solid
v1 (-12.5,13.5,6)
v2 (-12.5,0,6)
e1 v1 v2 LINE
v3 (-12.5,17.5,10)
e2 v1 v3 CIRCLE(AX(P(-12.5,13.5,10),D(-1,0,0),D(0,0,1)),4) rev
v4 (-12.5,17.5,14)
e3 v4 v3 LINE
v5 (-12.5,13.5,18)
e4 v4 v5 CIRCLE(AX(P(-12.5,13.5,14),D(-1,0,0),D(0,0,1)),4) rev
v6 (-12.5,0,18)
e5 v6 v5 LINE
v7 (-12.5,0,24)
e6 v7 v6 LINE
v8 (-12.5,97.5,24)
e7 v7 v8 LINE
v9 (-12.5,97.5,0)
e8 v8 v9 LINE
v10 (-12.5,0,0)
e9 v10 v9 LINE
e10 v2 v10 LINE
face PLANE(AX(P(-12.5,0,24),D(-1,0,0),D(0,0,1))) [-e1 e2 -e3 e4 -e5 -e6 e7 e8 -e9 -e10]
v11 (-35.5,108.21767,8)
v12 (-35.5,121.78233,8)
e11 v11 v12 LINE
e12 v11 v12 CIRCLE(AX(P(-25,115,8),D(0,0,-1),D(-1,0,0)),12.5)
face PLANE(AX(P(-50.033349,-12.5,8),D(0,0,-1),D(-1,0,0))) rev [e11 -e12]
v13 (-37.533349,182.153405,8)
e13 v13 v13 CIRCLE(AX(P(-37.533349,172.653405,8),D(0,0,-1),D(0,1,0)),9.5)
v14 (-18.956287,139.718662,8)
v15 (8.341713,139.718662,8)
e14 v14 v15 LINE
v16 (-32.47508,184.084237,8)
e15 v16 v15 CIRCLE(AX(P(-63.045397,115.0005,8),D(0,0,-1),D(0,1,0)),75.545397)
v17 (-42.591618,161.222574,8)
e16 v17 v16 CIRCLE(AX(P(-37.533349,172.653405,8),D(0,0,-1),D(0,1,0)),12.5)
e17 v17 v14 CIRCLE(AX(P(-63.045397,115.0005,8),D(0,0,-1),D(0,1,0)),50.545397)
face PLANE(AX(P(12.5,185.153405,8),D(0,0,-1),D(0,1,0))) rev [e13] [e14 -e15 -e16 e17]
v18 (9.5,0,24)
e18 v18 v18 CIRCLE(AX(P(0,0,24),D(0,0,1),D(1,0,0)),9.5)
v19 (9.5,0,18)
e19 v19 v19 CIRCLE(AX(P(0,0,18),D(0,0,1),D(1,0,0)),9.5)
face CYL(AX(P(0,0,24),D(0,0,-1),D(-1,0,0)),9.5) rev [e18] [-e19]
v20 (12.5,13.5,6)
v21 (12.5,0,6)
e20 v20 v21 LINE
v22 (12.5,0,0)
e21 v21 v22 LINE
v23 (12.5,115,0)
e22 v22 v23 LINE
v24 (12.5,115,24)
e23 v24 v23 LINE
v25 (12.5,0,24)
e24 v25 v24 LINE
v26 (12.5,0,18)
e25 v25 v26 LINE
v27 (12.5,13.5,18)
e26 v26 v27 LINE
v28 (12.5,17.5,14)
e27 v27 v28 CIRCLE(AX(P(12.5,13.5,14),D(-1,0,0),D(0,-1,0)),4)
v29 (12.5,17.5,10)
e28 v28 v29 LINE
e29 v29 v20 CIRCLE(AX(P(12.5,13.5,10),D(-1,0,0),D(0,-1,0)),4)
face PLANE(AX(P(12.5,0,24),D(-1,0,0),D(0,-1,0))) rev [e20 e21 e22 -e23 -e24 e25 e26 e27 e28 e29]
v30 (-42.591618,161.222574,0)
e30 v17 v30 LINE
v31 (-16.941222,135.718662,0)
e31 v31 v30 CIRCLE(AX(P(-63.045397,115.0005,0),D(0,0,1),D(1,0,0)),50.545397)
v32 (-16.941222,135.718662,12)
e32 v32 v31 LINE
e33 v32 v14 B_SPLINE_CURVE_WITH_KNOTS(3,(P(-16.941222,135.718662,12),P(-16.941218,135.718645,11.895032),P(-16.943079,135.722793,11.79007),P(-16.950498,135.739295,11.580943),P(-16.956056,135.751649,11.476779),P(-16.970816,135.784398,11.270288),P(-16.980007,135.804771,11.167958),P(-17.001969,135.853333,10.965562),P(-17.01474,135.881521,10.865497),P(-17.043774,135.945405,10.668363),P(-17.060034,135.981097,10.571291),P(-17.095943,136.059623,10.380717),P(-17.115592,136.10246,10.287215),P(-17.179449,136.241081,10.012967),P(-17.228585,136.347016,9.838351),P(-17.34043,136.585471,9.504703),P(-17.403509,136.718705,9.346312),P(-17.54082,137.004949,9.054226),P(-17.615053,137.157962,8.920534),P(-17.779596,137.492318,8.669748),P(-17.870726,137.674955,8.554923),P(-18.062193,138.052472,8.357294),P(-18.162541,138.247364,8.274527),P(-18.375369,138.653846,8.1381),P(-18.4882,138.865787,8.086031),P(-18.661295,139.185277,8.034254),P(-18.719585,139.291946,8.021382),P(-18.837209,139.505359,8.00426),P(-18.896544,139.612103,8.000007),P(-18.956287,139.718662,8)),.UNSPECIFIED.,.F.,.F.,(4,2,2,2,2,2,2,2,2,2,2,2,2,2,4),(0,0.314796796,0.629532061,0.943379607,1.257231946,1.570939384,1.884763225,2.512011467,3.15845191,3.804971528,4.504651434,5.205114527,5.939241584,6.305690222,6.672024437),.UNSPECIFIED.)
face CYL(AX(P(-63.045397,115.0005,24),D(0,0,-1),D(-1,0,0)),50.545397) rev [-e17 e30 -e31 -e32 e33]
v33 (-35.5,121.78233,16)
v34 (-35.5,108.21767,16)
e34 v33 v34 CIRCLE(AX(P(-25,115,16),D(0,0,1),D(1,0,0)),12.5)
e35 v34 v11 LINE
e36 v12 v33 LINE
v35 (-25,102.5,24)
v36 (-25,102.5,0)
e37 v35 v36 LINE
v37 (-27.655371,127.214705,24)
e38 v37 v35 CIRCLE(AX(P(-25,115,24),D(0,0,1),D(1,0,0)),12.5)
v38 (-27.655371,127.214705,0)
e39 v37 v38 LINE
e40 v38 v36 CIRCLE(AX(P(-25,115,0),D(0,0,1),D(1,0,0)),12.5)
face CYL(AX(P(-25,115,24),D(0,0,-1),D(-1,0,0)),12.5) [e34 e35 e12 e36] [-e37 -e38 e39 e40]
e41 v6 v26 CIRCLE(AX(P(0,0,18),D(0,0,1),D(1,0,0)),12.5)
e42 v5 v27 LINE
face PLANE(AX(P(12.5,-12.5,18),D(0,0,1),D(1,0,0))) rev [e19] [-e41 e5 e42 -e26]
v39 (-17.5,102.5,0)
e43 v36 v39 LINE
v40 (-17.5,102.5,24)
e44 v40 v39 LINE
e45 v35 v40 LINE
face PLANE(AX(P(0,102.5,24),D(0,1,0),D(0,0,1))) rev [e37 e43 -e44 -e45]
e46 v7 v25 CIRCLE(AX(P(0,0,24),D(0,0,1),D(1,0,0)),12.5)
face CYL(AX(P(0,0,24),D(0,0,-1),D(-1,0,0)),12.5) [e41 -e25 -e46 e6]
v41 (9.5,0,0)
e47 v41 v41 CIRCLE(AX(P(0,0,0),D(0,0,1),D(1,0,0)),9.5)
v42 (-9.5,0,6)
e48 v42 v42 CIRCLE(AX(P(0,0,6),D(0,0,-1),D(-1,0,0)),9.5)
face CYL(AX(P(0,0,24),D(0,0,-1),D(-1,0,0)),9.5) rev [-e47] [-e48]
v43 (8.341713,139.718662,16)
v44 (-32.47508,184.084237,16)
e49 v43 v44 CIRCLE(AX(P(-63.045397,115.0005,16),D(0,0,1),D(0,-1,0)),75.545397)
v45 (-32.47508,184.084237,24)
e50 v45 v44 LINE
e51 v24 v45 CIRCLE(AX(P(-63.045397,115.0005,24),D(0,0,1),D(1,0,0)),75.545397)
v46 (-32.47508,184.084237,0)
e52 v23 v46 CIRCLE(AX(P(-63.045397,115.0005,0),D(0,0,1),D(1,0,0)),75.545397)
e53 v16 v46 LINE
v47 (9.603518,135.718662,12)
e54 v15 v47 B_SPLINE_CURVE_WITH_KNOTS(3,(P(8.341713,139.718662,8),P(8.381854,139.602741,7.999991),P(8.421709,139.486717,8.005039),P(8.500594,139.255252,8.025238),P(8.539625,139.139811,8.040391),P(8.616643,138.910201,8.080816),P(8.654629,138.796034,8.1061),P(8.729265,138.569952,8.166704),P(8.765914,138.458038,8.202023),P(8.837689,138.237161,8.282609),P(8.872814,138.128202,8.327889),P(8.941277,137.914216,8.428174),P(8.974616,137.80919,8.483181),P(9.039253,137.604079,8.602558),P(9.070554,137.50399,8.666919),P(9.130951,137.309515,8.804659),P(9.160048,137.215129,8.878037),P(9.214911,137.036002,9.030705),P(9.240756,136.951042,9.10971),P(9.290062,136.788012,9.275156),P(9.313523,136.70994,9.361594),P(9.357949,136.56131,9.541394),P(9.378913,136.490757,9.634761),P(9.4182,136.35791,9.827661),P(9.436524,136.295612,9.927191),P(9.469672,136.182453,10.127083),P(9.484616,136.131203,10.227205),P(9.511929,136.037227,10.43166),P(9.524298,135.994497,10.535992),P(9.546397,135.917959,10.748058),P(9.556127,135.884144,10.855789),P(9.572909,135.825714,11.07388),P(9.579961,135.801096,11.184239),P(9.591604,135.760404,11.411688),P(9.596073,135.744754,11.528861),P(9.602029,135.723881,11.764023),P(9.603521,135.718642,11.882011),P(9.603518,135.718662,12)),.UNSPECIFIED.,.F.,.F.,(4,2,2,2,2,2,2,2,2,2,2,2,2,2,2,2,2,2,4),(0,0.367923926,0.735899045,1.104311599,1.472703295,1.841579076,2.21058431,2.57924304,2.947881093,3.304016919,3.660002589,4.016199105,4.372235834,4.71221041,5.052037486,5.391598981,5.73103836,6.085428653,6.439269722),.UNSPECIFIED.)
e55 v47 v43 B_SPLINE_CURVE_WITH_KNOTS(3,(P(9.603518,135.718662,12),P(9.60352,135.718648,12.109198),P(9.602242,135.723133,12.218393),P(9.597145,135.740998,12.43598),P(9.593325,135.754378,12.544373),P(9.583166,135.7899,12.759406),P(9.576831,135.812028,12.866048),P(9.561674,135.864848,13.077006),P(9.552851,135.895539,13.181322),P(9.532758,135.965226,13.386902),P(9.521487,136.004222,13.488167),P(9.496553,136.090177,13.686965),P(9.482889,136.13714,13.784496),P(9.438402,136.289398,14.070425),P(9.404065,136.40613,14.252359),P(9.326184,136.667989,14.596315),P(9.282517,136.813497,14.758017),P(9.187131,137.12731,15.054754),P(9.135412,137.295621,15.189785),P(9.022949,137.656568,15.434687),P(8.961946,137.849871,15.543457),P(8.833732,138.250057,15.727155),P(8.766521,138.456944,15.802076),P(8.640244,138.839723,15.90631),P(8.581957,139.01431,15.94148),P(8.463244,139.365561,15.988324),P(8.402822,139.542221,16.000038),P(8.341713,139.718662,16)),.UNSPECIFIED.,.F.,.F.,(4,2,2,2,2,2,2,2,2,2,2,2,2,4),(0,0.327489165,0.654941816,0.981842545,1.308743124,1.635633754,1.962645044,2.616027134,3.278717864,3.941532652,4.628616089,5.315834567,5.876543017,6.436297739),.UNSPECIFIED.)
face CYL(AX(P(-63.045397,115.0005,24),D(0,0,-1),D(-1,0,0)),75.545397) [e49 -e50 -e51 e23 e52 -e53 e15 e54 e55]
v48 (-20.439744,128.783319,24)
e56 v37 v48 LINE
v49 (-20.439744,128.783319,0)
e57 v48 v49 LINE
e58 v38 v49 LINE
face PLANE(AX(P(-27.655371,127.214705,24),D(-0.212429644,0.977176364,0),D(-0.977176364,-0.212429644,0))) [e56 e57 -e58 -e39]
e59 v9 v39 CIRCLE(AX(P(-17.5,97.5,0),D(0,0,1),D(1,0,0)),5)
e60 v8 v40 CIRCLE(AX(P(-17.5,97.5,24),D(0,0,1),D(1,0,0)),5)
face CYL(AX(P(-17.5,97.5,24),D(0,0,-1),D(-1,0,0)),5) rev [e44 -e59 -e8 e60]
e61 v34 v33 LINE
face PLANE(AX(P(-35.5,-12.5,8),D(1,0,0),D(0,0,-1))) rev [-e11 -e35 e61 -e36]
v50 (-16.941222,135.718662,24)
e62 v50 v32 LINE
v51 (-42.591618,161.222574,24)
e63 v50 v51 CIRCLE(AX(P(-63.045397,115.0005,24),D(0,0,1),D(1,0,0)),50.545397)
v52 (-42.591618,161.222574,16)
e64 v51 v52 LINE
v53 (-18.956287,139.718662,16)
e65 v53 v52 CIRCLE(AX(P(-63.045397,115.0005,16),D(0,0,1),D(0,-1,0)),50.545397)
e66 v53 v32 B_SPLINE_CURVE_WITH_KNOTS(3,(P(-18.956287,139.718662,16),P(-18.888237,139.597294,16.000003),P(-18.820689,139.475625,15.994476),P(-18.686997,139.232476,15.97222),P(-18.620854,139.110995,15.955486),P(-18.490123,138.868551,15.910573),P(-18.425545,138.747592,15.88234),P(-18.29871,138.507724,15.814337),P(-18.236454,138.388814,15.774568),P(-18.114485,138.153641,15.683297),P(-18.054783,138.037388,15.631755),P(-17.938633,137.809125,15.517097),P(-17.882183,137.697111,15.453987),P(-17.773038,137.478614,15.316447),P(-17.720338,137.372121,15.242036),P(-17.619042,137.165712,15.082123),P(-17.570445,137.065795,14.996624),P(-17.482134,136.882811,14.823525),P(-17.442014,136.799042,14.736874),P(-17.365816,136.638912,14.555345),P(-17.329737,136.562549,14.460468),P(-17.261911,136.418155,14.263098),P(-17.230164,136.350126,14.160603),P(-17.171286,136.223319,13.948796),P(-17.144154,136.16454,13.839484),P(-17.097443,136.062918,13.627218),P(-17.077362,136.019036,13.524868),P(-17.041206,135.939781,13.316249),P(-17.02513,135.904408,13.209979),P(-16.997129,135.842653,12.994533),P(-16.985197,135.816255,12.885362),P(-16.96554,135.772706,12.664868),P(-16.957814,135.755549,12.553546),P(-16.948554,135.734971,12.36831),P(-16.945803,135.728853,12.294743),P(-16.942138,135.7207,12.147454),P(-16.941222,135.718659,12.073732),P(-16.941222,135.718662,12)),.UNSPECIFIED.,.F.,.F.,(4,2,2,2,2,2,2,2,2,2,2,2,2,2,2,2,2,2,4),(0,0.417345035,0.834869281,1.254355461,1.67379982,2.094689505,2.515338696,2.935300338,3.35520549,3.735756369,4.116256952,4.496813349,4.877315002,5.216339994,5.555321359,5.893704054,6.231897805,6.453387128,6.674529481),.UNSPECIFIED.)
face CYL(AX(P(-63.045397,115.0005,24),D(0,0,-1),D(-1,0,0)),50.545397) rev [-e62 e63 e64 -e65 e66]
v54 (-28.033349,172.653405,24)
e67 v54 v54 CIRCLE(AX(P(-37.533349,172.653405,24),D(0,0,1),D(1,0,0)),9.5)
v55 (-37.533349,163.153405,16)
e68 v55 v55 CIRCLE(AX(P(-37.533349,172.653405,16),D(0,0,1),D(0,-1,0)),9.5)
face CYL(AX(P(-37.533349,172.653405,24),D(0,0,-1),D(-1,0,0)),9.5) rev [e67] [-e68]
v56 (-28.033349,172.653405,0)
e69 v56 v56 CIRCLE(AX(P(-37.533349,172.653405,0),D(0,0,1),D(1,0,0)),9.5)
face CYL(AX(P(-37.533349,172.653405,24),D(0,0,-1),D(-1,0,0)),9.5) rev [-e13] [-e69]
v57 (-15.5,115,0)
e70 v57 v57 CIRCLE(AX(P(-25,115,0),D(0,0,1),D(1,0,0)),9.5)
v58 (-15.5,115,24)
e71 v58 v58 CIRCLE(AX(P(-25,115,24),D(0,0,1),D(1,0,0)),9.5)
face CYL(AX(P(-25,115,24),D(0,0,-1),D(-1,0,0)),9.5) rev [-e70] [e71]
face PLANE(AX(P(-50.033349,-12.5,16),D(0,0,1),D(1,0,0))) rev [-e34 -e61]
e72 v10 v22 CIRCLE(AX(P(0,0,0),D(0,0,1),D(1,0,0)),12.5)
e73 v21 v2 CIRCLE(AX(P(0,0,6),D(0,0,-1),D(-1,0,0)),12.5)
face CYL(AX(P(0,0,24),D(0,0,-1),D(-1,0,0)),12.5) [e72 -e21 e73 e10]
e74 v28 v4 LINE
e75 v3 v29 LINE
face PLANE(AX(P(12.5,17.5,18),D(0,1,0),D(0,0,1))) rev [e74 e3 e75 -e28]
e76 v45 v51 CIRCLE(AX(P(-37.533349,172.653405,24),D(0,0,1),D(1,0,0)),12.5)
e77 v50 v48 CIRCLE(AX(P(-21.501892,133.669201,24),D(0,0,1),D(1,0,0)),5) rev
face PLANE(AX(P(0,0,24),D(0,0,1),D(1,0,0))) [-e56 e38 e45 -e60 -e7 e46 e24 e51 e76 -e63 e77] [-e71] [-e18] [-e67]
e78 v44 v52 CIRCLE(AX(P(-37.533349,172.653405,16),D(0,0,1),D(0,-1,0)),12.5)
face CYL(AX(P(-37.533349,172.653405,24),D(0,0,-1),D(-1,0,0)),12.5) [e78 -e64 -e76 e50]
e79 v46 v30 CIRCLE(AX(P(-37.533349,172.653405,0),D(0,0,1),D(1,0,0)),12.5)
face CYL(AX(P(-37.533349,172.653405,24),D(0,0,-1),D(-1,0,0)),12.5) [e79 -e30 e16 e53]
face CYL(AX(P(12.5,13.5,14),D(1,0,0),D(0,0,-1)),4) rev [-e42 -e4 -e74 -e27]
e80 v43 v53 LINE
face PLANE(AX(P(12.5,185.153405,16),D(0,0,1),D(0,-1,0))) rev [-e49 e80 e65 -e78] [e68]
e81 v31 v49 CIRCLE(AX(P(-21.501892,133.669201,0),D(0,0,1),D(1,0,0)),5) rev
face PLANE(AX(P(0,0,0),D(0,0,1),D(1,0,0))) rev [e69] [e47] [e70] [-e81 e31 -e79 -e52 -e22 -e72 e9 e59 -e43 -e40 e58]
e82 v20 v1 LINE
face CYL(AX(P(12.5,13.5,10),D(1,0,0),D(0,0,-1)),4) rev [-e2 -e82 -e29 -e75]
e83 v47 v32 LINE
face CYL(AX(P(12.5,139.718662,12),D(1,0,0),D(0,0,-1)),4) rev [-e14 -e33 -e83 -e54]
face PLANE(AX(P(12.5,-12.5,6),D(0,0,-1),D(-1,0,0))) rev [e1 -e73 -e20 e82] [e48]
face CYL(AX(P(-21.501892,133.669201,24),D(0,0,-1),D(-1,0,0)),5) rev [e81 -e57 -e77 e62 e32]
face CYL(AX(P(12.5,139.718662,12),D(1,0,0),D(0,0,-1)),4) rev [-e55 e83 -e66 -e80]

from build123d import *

# Parameters (mm, degrees)
CROQUIS2_R                 = 12.5
CROQUIS2_R_2               = 9.5
SALIENTE_EXTRUIR1_DEPTH    = 24
CORTAR_EXTRUIR3_DEPTH      = 191.437747955
CORTAR_EXTRUIR3_DEPTH_BACK = 191.437747955
CROQUIS5_W                 = 8
CROQUIS5_H                 = 49.434743854
CORTAR_EXTRUIR4_DEPTH      = 191.437747955
CORTAR_EXTRUIR4_DEPTH_BACK = 191.437747955
CROQUIS6_W                 = 12
CROQUIS6_H                 = 30
CORTAR_EXTRUIR5_DEPTH      = 159.265939688
CORTAR_EXTRUIR5_DEPTH_BACK = 159.265939688
CROQUIS7_W                 = 14.533349016
CROQUIS7_H                 = 8
REDONDEO1_R                = 4


with BuildPart() as part:
    # Croquis2 → Saliente-Extruir1 (new body)
    # profile 1 of 4: a face of its own
    with BuildSketch(Plane.XY):
        with Locations((-37.533349016, 172.653405471)):
            Circle(CROQUIS2_R)
        with Locations((-37.533349016, 172.653405471)):
            Circle(CROQUIS2_R_2, mode=Mode.SUBTRACT)
    # profile 2 of 4: a face of its own
    with BuildSketch(Plane.XY):
        with BuildLine():
            Line((-12.5, 58.855421297), (-12.5, 0))
            ThreePointArc((-12.5, 0), (0, 12.5), (12.5, 0))
            Line((12.5, 0), (12.5, 115))
            ThreePointArc((12.5, 115), (0.265693313, 156.217157525), (-32.475079629, 184.08423706))
            ThreePointArc((-32.475079629, 184.08423706), (-27.057701844, 179.473289366), (-25.033349016, 172.653405471))
            ThreePointArc((-25.033349016, 172.653405471), (-30.713465121, 162.1777583), (-42.591618403, 161.222573883))
            ThreePointArc((-42.591618403, 161.222573883), (-27.406897086, 150.843693068), (-16.941222141, 135.718661617))
            ThreePointArc((-16.941222141, 135.718661617), (-17.037727548, 131.417260647), (-20.439743892, 128.783319041))
            Line((-20.439743892, 128.783319041), (-27.655370554, 127.214704549))
            ThreePointArc((-27.655370554, 127.214704549), (-17.155961879, 124.732474812), (-12.5, 115))
            ThreePointArc((-12.5, 115), (-16.161165235, 106.161165235), (-25, 102.5))
            Line((-25, 102.5), (-17.5, 102.5))
            ThreePointArc((-17.5, 102.5), (-13.964466094, 101.035533906), (-12.5, 97.5))
            Line((-12.5, 97.5), (-12.5, 58.855421297))
        make_face()
    # profile 3 of 4: a face of its own
    with BuildSketch(Plane.XY):
        with Locations((-25, 115)):
            Circle(CROQUIS2_R)
        with Locations((-25, 115)):
            Circle(CROQUIS2_R_2, mode=Mode.SUBTRACT)
    # profile 4 of 4: a face of its own
    with BuildSketch(Plane.XY):
        Circle(CROQUIS2_R)
        Circle(CROQUIS2_R_2, mode=Mode.SUBTRACT)
    extrude(amount=SALIENTE_EXTRUIR1_DEPTH)

    # Croquis5 → Cortar-Extruir3 (cut, two sides: drawn at the far end of the back side and taken through both)
    with BuildSketch(Plane.ZY.offset(12.5).offset(-CORTAR_EXTRUIR3_DEPTH_BACK)):
        with Locations((12, 160.436033544)):
            Rectangle(CROQUIS5_W, CROQUIS5_H)
    extrude(amount=CORTAR_EXTRUIR3_DEPTH + CORTAR_EXTRUIR3_DEPTH_BACK, mode=Mode.SUBTRACT)

    # Croquis6 → Cortar-Extruir4 (cut, two sides: drawn at the far end of the back side and taken through both)
    with BuildSketch(Plane.ZY.offset(12.5).offset(-CORTAR_EXTRUIR4_DEPTH_BACK)):
        with Locations((12, 2.5)):
            Rectangle(CROQUIS6_W, CROQUIS6_H)
    extrude(amount=CORTAR_EXTRUIR4_DEPTH + CORTAR_EXTRUIR4_DEPTH_BACK, mode=Mode.SUBTRACT)

    # Croquis7 → Cortar-Extruir5 (cut, two sides: drawn at the far end of the back side and taken through both)
    with BuildSketch(Plane(origin=(0, 135.718661617, 0), x_dir=(1, 0, 0), z_dir=(0, 1, 0)).offset(-CORTAR_EXTRUIR5_DEPTH_BACK)):
        with Locations((-42.766674508, -12)):
            Rectangle(CROQUIS7_W, CROQUIS7_H)
    extrude(amount=CORTAR_EXTRUIR5_DEPTH + CORTAR_EXTRUIR5_DEPTH_BACK, mode=Mode.SUBTRACT)

    # Redondeo1
    # the kernel refuses this fillet: 4 mm, written as the material it adds along each edge
    with BuildSketch(Plane(origin=(-26.941222141, 135.718661617, 16), x_dir=(0, 1, 0), z_dir=(1, 0, 0))) as redondeo1_piece_1_section:
        with BuildLine():
            CenterArc((REDONDEO1_R, -REDONDEO1_R), REDONDEO1_R, 90, 90)
            Line((0, -REDONDEO1_R), (-REDONDEO1_R * 0.02, -REDONDEO1_R))
            Line((-REDONDEO1_R * 0.02, -REDONDEO1_R), (-REDONDEO1_R * 0.02, REDONDEO1_R * 0.02))
            Line((-REDONDEO1_R * 0.02, REDONDEO1_R * 0.02), (REDONDEO1_R, REDONDEO1_R * 0.02))
            Line((REDONDEO1_R, REDONDEO1_R * 0.02), (REDONDEO1_R, 0))
        make_face()
    redondeo1_piece_1 = extrude(amount=46.544739715, mode=Mode.PRIVATE)
    redondeo1_piece_1 = redondeo1_piece_1 & Plane(origin=(-63.045397247, 115.0005, 15.097345218), x_dir=(0.9999999999780976, -6.618536910383344e-06, 0), z_dir=(0, 0, -1)) * Cylinder(75.545397249, 110, mode=Mode.PRIVATE)
    redondeo1_piece_1 = redondeo1_piece_1 - Plane(origin=(-63.045397247, 115.0005, 15.097345218), x_dir=(0.40466155096197987, 0.9144665270927335, 0), z_dir=(0, 0, -1)) * Cylinder(50.545397249, 110, mode=Mode.PRIVATE)
    add(redondeo1_piece_1)
    with BuildSketch(Plane(origin=(19.603517574, 135.718661617, 8), x_dir=(0, 0, 1), z_dir=(-1, 0, 0))) as redondeo1_piece_2_section:
        with BuildLine():
            CenterArc((REDONDEO1_R, REDONDEO1_R), REDONDEO1_R, 180, 90)
            Line((0, REDONDEO1_R), (-REDONDEO1_R * 0.02, REDONDEO1_R))
            Line((-REDONDEO1_R * 0.02, REDONDEO1_R), (-REDONDEO1_R * 0.02, -REDONDEO1_R * 0.02))
            Line((-REDONDEO1_R * 0.02, -REDONDEO1_R * 0.02), (REDONDEO1_R, -REDONDEO1_R * 0.02))
            Line((REDONDEO1_R, -REDONDEO1_R * 0.02), (REDONDEO1_R, 0))
        make_face()
    redondeo1_piece_2 = extrude(amount=46.544739715, mode=Mode.PRIVATE)
    redondeo1_piece_2 = redondeo1_piece_2 - Plane(origin=(-63.045397247, 115.0005, 8.902651886), x_dir=(0.40466155096197987, 0.9144665270927335, 0), z_dir=(0, 0, -1)) * Cylinder(50.545397249, 110, mode=Mode.PRIVATE)
    redondeo1_piece_2 = redondeo1_piece_2 & Plane(origin=(-63.045397247, 115.0005, 8.902651886), x_dir=(0.9999999999780976, -6.618536910383344e-06, 0), z_dir=(0, 0, -1)) * Cylinder(75.545397249, 110, mode=Mode.PRIVATE)
    add(redondeo1_piece_2)
    with BuildSketch(Plane(origin=(-12.5, 17.5, 6), x_dir=(0, 0, 1), z_dir=(1, 0, 0))) as redondeo1_piece_3:
        with BuildLine():
            CenterArc((REDONDEO1_R, REDONDEO1_R), REDONDEO1_R, 180, 90)
            Line((0, REDONDEO1_R), (-REDONDEO1_R * 0.02, REDONDEO1_R))
            Line((-REDONDEO1_R * 0.02, REDONDEO1_R), (-REDONDEO1_R * 0.02, -REDONDEO1_R * 0.02))
            Line((-REDONDEO1_R * 0.02, -REDONDEO1_R * 0.02), (REDONDEO1_R, -REDONDEO1_R * 0.02))
            Line((REDONDEO1_R, -REDONDEO1_R * 0.02), (REDONDEO1_R, 0))
        make_face()
    extrude(amount=25)
    with BuildSketch(Plane(origin=(12.5, 17.5, 18), x_dir=(0, -1, 0), z_dir=(-1, 0, 0))) as redondeo1_piece_4:
        with BuildLine():
            CenterArc((REDONDEO1_R, -REDONDEO1_R), REDONDEO1_R, 90, 90)
            Line((0, -REDONDEO1_R), (-REDONDEO1_R * 0.02, -REDONDEO1_R))
            Line((-REDONDEO1_R * 0.02, -REDONDEO1_R), (-REDONDEO1_R * 0.02, REDONDEO1_R * 0.02))
            Line((-REDONDEO1_R * 0.02, REDONDEO1_R * 0.02), (REDONDEO1_R, REDONDEO1_R * 0.02))
            Line((REDONDEO1_R, REDONDEO1_R * 0.02), (REDONDEO1_R, 0))
        make_face()
    extrude(amount=25)


solid = part.part
